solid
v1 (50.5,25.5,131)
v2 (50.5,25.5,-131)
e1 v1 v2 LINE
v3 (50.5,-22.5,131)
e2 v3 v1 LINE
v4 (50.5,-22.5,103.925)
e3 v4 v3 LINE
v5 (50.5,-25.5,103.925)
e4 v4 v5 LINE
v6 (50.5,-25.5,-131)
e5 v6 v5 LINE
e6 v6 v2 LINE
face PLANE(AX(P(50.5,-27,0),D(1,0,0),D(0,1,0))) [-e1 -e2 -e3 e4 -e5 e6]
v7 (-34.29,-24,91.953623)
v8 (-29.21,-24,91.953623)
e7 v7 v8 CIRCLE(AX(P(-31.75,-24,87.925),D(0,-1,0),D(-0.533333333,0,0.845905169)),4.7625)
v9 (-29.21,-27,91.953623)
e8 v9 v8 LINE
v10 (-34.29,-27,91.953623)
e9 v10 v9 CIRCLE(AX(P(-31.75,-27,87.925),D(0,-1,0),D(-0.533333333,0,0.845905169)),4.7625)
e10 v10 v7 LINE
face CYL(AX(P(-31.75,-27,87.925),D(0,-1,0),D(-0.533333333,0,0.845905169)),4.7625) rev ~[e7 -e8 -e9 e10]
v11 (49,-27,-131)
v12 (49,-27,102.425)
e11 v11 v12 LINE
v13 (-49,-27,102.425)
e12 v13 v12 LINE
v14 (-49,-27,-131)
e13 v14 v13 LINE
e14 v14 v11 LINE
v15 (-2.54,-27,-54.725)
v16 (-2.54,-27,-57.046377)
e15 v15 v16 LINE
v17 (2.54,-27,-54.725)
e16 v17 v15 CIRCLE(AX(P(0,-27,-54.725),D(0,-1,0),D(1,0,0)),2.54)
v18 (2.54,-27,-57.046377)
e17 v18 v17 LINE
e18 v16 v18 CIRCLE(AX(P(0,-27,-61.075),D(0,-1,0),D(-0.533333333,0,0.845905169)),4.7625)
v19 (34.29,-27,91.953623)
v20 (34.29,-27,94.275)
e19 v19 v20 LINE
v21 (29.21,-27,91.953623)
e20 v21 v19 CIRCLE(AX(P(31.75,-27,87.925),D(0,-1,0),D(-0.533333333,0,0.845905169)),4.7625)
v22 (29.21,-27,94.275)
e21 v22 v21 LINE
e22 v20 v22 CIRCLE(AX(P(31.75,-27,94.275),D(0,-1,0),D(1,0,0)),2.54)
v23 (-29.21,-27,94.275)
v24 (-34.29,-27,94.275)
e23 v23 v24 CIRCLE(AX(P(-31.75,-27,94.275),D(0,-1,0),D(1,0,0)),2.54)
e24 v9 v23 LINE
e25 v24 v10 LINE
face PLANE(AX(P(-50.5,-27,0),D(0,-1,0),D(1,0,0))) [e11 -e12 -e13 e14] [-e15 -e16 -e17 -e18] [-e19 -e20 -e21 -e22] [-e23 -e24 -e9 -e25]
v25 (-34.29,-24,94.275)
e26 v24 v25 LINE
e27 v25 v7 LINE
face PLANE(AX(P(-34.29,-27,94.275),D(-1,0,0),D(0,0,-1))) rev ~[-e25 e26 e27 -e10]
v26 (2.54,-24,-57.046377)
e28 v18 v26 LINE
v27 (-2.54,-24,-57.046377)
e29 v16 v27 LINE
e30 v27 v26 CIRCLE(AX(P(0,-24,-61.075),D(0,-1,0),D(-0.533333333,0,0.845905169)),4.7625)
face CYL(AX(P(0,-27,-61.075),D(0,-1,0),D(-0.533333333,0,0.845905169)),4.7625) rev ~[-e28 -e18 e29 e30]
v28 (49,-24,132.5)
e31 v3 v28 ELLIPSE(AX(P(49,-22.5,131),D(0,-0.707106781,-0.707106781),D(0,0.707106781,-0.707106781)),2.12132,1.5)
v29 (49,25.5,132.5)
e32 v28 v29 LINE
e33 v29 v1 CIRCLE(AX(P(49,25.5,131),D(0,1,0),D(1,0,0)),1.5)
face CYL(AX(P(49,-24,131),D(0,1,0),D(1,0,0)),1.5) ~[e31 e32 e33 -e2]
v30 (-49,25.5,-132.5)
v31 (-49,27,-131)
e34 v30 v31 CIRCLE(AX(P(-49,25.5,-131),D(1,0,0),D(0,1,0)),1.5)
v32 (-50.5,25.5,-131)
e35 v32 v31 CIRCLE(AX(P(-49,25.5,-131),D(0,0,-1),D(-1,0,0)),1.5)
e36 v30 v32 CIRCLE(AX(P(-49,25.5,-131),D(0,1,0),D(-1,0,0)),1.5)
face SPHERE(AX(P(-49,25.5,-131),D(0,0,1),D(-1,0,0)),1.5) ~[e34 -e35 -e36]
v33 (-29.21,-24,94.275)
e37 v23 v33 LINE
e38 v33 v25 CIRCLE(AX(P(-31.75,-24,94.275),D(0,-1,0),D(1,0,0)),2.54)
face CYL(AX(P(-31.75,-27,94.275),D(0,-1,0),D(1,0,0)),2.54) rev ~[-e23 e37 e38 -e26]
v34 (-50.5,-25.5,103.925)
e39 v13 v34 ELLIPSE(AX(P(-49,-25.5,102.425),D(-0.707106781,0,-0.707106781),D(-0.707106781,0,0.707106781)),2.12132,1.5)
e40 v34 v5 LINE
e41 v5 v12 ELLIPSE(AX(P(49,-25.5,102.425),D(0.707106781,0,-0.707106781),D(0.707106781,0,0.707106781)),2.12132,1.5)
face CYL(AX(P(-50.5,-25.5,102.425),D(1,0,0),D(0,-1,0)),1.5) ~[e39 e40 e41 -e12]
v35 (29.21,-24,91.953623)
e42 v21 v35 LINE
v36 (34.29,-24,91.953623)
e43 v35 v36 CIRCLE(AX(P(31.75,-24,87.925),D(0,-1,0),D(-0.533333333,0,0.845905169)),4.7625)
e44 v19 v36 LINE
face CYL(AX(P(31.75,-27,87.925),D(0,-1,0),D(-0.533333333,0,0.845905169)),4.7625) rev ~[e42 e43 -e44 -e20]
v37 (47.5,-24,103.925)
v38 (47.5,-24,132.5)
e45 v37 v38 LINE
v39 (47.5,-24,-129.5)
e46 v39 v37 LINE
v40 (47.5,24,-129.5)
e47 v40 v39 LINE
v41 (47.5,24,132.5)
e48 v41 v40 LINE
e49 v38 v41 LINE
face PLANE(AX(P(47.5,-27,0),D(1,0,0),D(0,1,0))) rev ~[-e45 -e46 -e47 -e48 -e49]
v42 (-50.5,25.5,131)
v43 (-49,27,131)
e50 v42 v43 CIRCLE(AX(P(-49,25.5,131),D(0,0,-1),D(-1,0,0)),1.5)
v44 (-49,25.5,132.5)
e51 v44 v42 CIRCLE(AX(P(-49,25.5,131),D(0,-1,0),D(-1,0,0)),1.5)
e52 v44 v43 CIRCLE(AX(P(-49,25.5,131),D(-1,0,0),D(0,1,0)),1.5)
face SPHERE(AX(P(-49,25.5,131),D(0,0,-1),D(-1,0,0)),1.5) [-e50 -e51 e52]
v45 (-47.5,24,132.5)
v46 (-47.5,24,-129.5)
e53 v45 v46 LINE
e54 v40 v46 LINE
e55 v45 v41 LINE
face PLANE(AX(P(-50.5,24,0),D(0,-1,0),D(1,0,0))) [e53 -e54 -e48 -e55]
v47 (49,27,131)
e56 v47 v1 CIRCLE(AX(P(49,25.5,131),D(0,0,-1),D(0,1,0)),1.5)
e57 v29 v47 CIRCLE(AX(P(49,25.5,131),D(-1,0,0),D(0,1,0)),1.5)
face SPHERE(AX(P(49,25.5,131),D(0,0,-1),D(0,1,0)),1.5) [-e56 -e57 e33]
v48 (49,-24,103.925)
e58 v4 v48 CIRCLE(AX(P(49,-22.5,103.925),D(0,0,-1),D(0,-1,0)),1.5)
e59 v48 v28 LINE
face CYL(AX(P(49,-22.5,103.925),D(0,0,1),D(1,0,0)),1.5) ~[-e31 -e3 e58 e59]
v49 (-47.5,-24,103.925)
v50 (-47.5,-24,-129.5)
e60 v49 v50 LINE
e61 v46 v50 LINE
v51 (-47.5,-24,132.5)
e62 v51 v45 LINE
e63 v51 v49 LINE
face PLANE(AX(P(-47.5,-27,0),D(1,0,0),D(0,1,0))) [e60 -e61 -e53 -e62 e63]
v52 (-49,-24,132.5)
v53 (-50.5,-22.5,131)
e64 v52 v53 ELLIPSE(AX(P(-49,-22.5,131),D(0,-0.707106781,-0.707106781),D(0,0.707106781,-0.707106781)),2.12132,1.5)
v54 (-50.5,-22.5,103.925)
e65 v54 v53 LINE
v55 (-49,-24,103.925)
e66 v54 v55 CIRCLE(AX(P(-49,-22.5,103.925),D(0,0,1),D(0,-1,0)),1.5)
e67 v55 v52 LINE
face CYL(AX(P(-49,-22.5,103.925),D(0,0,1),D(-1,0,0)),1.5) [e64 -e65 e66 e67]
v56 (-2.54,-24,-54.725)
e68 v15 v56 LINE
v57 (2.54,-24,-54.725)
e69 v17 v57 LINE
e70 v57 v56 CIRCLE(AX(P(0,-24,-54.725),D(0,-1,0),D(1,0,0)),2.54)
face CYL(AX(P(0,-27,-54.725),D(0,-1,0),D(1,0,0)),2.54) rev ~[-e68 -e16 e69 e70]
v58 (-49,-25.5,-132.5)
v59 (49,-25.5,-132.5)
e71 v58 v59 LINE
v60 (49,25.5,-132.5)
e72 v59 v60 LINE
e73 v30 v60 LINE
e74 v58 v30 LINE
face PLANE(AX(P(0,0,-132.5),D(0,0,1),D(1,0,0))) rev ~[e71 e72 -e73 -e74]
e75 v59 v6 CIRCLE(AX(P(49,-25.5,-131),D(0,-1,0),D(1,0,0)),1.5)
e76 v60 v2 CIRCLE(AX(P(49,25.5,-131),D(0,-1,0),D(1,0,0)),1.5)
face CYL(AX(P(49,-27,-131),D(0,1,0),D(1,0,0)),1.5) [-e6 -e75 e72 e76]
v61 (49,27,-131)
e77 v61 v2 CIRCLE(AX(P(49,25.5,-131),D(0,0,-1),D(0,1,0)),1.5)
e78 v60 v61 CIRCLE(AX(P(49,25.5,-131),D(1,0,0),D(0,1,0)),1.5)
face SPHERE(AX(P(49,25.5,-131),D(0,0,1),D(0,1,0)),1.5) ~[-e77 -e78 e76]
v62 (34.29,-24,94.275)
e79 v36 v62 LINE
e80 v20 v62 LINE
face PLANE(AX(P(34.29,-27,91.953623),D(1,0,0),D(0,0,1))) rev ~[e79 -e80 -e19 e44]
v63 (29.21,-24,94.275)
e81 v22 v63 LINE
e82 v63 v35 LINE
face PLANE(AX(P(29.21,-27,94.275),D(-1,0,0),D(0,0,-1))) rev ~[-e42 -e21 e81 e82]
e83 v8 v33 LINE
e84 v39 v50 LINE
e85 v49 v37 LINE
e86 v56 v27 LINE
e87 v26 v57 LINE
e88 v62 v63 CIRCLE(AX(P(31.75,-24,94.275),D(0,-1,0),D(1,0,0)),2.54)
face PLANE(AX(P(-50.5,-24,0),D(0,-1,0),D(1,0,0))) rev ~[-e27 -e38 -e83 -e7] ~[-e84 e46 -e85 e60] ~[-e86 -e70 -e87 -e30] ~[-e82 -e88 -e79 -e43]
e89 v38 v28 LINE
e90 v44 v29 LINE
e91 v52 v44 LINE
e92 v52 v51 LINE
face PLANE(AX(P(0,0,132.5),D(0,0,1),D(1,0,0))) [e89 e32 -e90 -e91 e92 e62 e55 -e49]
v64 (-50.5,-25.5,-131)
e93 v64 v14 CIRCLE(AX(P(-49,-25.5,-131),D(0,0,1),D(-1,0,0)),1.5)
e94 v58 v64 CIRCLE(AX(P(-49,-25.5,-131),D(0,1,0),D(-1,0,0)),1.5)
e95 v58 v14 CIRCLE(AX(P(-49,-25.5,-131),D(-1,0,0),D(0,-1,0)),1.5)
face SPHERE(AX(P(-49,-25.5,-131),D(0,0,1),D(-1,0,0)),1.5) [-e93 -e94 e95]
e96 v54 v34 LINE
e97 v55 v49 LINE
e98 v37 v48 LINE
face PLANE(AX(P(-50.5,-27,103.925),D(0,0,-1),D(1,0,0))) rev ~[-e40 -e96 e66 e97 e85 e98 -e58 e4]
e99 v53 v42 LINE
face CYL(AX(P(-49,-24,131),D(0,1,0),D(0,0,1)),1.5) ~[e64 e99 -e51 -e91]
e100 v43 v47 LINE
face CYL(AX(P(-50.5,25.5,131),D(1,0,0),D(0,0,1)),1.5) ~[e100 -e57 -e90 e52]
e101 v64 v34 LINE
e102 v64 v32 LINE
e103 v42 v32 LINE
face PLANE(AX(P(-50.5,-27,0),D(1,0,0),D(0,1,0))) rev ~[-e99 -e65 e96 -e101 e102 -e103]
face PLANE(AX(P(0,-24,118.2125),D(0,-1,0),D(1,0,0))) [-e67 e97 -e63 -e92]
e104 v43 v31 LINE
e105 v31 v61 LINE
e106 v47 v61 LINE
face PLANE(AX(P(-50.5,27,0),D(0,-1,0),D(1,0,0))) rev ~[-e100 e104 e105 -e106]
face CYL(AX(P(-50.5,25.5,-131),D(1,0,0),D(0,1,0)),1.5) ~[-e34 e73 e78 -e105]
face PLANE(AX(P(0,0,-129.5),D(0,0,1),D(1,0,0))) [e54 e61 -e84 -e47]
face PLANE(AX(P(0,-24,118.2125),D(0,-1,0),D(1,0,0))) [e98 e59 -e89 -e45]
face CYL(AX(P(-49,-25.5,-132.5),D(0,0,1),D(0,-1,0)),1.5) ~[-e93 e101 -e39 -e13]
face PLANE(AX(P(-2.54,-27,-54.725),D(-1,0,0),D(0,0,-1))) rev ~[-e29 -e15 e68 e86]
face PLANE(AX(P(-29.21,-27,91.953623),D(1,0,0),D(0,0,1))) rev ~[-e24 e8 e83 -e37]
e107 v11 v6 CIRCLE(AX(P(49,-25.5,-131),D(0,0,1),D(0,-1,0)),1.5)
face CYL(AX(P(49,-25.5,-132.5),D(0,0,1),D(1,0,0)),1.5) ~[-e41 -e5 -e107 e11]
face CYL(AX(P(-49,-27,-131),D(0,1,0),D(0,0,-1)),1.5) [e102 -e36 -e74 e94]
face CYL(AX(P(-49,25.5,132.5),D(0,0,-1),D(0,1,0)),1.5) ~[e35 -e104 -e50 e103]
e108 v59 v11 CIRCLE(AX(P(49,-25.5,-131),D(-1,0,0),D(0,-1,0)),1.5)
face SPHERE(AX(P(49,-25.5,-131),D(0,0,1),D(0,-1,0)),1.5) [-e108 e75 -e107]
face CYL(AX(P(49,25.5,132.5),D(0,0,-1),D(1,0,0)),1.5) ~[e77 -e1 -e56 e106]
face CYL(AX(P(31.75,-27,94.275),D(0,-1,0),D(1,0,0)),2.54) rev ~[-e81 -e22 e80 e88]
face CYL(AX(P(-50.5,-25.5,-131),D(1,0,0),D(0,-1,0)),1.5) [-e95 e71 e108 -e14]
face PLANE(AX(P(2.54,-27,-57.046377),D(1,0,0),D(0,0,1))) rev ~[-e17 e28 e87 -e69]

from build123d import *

# Parameters (mm, degrees)
F0_W     = 101
F0_H     = 54
F1_DEPTH = 132.5
F2_T     = -3
F3_W     = 101
F3_H     = 28.575
F4_DEPTH = 3
F6_DEPTH = 3
F7_R     = 1.5


with BuildPart() as f1:
    # F0 (on Top) → F1 (new body, symmetric)
    with BuildSketch(Plane.XY):
        Rectangle(F0_W, F0_H)
    extrude(amount=F1_DEPTH, both=True)

    # F2
    f2_openings = [f1.faces().sort_by_distance(p)[0] for p in [
        (0, 0, 132.5),
    ]]
    offset(amount=F2_T, openings=f2_openings)

    # F3 (on face) → F4 (cut, through all)
    with BuildSketch(Plane.XZ.offset(27)):
        with Locations((0, 118.2125)):
            Rectangle(F3_W, F3_H)
    extrude(amount=-F4_DEPTH, mode=Mode.SUBTRACT)

    # F5 (on face) → F6 (cut, through all)
    with BuildSketch(Plane.XZ.offset(27)):
        with BuildLine():
            Line((-34.29, 94.275), (-34.29, 91.9536233691))
            ThreePointArc((-34.29, 91.9536233691), (-31.75, 83.1625), (-29.21, 91.9536233691))
            Line((-29.21, 91.9536233691), (-29.21, 94.275))
            ThreePointArc((-29.21, 94.275), (-31.75, 96.815), (-34.29, 94.275))
        make_face()
        with BuildLine():
            ThreePointArc((34.29, 94.275), (31.75, 96.815), (29.21, 94.275))
            Line((29.21, 94.275), (29.21, 91.9536233691))
            ThreePointArc((29.21, 91.9536233691), (31.75, 83.1625), (34.29, 91.9536233691))
            Line((34.29, 91.9536233691), (34.29, 94.275))
        make_face()
        with BuildLine():
            Line((-2.54, -54.725), (-2.54, -57.0463766309))
            ThreePointArc((-2.54, -57.0463766309), (0, -65.8375), (2.54, -57.0463766309))
            Line((2.54, -57.0463766309), (2.54, -54.725))
            ThreePointArc((2.54, -54.725), (0, -52.185), (-2.54, -54.725))
        make_face()
    extrude(amount=-F6_DEPTH, mode=Mode.SUBTRACT)

    # F7
    f7_edges = [f1.edges().sort_by_distance(p)[0] for p in [
        (50.5, -27, -14.2875),
        (50.5, 27, 0),
        (-50.5, -27, -14.2875),
        (-50.5, 27, 0),
        (-50.5, 0, -132.5),
        (0, 27, -132.5),
        (0, -27, -132.5),
        (50.5, 0, -132.5),
        (-50.5, 1.5, 132.5),
        (0, 27, 132.5),
        (50.5, 1.5, 132.5),
        (0, -27, 103.925),
        (-50.5, -24, 118.2125),
        (50.5, -24, 118.2125),
    ]]
    fillet(f7_edges, radius=F7_R)


solid = f1.part
